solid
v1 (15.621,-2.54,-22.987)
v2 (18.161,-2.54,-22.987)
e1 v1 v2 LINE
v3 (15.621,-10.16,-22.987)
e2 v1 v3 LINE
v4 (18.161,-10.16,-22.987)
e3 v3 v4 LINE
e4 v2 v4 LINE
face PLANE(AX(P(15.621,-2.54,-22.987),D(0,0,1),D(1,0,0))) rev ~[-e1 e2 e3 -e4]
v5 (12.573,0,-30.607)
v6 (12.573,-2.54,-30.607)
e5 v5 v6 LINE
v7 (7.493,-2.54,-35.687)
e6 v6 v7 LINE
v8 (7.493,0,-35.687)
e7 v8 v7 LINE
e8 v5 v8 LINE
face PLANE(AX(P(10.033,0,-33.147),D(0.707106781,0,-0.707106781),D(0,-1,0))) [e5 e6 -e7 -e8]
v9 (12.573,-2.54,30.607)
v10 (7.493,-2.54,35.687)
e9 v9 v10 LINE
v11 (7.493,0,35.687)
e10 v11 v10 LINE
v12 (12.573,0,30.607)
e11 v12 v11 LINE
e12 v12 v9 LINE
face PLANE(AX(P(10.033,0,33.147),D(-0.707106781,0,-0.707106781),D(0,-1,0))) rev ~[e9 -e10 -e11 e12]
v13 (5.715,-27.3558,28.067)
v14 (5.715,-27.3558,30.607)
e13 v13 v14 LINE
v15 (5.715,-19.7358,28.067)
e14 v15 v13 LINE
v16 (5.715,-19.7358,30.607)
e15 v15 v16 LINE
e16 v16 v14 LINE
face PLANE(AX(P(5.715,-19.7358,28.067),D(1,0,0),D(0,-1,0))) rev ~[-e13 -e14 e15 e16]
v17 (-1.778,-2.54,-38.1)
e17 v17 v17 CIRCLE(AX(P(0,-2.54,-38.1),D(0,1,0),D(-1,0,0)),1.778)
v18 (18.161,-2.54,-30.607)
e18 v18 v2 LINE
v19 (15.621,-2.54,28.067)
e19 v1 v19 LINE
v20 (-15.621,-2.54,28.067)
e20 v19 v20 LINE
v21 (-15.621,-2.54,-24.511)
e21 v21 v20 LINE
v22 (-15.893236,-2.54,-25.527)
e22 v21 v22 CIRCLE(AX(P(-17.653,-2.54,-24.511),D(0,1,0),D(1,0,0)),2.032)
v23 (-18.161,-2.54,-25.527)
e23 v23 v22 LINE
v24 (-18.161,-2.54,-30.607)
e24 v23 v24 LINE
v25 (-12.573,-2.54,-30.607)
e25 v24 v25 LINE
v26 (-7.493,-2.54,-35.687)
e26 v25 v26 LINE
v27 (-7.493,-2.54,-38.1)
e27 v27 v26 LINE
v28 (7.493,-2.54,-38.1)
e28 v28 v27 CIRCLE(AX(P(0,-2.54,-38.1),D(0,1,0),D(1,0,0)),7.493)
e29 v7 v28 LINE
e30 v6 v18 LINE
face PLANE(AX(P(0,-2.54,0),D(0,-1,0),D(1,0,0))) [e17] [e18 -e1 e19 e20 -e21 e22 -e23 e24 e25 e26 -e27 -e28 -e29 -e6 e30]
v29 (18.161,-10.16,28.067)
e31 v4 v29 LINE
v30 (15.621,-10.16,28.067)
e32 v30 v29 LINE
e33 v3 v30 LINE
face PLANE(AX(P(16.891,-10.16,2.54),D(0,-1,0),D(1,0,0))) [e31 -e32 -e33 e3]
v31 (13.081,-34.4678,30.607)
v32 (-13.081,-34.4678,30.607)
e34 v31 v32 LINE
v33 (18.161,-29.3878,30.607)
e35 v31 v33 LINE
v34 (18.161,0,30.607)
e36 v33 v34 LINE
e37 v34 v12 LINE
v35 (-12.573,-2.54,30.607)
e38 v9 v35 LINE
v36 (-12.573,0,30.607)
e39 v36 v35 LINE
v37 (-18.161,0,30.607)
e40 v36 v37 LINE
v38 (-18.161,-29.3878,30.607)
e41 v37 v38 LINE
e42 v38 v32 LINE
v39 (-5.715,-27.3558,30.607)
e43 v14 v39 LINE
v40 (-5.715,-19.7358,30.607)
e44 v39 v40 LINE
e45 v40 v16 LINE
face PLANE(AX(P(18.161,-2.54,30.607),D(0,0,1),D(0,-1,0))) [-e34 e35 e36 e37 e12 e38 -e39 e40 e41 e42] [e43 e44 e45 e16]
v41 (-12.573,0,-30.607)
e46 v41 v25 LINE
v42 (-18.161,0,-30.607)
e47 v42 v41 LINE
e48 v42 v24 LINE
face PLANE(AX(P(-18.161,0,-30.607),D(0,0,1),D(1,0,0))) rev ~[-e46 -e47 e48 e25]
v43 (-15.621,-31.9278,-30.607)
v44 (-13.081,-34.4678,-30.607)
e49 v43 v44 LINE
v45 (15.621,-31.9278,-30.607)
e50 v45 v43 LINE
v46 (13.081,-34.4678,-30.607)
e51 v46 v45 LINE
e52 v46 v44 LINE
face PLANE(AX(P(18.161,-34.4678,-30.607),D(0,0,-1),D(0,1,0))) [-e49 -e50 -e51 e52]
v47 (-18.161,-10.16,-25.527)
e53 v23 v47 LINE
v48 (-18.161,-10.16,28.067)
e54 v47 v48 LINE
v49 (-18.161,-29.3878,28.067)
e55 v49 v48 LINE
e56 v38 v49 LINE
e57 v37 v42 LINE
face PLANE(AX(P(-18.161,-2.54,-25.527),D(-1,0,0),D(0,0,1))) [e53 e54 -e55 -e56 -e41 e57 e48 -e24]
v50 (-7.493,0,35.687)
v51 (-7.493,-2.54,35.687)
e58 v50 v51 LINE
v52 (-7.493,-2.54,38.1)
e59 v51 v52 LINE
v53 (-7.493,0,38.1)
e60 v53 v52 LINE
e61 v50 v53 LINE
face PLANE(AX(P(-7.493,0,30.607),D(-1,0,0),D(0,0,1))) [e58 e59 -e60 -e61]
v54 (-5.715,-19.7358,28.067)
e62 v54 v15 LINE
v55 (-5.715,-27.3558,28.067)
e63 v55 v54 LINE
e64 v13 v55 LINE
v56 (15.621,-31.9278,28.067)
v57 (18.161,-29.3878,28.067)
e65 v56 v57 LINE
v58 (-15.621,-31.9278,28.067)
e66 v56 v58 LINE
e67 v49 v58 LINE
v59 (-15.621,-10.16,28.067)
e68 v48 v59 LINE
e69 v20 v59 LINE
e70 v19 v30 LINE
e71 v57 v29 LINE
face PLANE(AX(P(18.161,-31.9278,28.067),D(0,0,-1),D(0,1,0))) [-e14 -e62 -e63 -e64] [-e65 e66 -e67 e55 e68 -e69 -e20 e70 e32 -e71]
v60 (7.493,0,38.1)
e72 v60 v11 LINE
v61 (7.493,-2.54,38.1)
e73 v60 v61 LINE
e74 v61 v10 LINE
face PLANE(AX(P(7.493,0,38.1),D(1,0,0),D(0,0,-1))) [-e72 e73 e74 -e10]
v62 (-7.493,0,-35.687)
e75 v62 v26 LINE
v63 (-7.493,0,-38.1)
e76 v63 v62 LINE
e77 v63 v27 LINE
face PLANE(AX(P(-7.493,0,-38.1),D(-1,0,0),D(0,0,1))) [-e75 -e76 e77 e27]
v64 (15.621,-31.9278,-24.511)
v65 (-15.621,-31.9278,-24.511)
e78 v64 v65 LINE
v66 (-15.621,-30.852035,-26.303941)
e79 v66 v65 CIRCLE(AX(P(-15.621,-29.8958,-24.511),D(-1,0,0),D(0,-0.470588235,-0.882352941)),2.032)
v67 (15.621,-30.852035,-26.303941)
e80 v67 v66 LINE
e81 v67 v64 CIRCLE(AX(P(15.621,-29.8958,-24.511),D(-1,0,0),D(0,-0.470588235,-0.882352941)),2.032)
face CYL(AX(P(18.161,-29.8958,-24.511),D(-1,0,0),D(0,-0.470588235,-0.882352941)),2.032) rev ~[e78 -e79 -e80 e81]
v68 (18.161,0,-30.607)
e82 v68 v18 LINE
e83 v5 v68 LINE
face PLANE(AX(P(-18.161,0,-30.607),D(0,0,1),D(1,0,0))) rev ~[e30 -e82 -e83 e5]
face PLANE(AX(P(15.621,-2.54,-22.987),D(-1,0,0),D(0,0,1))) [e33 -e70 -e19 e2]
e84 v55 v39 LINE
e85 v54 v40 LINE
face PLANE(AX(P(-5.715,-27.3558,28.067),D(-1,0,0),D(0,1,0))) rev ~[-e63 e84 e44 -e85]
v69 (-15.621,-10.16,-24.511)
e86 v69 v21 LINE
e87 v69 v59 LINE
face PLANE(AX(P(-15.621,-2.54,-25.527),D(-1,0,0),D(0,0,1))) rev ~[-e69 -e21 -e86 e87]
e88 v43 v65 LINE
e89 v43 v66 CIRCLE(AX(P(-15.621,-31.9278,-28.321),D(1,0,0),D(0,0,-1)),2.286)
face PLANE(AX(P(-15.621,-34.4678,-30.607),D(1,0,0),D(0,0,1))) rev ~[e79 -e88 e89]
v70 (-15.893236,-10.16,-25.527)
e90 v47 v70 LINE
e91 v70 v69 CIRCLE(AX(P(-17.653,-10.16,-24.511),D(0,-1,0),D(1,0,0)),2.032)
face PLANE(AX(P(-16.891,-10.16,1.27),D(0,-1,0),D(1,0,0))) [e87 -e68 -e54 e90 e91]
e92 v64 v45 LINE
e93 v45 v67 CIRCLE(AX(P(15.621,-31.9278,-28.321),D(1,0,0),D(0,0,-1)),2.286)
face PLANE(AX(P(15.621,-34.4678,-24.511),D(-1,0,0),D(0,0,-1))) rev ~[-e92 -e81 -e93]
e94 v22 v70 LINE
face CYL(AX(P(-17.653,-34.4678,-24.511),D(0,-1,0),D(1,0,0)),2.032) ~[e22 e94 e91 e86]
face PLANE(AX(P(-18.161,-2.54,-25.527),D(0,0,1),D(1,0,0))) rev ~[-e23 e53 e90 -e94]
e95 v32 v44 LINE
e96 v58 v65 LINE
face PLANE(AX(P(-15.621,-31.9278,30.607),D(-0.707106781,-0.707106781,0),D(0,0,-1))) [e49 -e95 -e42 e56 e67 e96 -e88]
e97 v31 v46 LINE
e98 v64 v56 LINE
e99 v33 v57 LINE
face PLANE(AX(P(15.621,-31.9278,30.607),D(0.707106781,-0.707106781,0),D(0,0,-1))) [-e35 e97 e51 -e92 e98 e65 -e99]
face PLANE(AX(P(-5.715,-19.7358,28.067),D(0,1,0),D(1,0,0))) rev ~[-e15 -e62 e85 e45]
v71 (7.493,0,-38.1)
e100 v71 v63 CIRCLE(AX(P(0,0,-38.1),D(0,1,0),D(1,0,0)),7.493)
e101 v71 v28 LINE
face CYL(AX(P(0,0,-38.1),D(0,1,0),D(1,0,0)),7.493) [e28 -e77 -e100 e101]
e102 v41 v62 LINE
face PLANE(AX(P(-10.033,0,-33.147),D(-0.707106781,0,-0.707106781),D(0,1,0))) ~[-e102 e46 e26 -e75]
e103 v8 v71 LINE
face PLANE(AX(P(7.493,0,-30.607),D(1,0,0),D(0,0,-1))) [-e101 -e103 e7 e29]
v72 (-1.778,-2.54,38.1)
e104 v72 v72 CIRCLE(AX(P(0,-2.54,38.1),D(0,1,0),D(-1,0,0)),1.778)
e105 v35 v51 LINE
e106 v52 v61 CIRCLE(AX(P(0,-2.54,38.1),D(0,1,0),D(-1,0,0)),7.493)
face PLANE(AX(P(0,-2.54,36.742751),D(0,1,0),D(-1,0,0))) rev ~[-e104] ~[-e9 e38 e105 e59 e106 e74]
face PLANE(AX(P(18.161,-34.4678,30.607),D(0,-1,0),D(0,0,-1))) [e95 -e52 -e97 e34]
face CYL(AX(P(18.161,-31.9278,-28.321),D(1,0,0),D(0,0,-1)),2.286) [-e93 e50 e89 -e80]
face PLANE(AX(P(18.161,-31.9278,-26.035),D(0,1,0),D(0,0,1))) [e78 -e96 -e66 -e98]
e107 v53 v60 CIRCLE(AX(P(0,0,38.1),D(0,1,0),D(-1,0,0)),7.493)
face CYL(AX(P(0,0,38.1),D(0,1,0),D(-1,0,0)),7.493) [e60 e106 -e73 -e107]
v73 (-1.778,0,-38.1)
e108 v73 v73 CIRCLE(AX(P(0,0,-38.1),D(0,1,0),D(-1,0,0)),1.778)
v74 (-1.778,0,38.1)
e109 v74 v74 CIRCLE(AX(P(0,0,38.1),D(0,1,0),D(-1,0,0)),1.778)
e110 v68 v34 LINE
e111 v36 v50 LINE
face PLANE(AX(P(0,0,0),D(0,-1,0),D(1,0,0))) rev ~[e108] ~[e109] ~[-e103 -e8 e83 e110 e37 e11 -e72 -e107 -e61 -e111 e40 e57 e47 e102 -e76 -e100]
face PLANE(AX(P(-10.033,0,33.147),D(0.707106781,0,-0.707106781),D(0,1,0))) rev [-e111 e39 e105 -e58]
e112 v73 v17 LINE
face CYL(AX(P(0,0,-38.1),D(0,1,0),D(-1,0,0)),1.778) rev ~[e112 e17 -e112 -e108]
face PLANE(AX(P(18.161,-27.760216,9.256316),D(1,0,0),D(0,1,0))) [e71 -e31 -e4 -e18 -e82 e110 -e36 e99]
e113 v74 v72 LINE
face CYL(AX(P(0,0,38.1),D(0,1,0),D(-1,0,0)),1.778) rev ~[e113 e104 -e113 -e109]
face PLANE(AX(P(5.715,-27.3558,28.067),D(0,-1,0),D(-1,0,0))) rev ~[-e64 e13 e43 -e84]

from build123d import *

# Parameters (mm, degrees)
F1_DEPTH       = 2.54
F3_DEPTH       = 36.322
F4_W           = 2.5400000004
F4_H           = 53.594
F4_W_2         = 2.5400000003
F4_H_2         = 51.054
F5_DEPTH       = 7.62
F6_R           = 2.032
F7_SIZE        = 5.08
F8_SIZE        = 5.08
F10_DEPTH      = 31.9278
F12_R          = 1.778
F13_DEPTH      = 2.54
F14_SIZE       = 5.08
F16_DEPTH      = 2.54
F16_DEPTH_BACK = 25.4


with BuildPart() as f1:
    # F0 (on Front) → F1 (new body)
    with BuildSketch(Plane.XZ):
        Polygon((18.161, 9.3117938122), (18.161, 30.607), (-18.161, 30.607), (-18.161, 9.3117938122), (-18.161, -9.3117938122), (-18.161, -30.607), (18.161, -30.607), (18.161, -9.3117938122), align=None)
    extrude(amount=F1_DEPTH)

    # F2 (on face) → F3 (join, through all)
    with BuildSketch(Plane.YZ.offset(18.161)):
        Polygon((-2.54, 28.067), (-2.54, 30.607), (-34.4678, 30.607), (-34.4678, -30.607), (-31.9278, -30.607), (-31.9278, -26.035), (-31.9278, 28.067), align=None)
        with BuildLine():
            ThreePointArc((-31.9278, -30.607), (-29.6418, -28.321), (-31.9278, -26.035))
            Line((-31.9278, -26.035), (-31.9278, -30.607))
        make_face()
    extrude(amount=-F3_DEPTH)

    # F4 (on face) → F5 (join)
    with BuildSketch(Plane.XZ.offset(2.54)):
        with Locations((-16.8910000002, 1.27)):
            Rectangle(F4_W, F4_H)
        with Locations((16.8909999998, 2.54)):
            Rectangle(F4_W_2, F4_H_2)
    extrude(amount=F5_DEPTH)

    # F6
    f6_edges = [f1.edges().sort_by_distance(p)[0] for p in [
        (0, -31.9278, -30.607),
        (0, -31.9278, -26.035),
    ]]
    fillet(f6_edges, radius=F6_R)

    # F7
    f7_edges = [f1.edges().sort_by_distance(p)[0] for p in [
        (18.161, -34.4678, 0),
    ]]
    chamfer(f7_edges, length=F7_SIZE)

    # F8
    f8_edges = [f1.edges().sort_by_distance(p)[0] for p in [
        (-18.161, -34.4678, 0),
    ]]
    chamfer(f8_edges, length=F8_SIZE)

    # F9 (on face) → F10 (cut, through all)
    with BuildSketch(Plane.XZ.offset(34.4678)):
        with BuildLine():
            ThreePointArc((-15.621, -24.511), (-15.910574375, -25.556455375), (-16.6967647059, -26.3039411765))
            ThreePointArc((-16.6967647059, -26.3039411765), (-17.8387457553, -28.8754364388), (-15.621, -30.607))
            Line((-15.621, -30.607), (-15.621, -24.511))
        make_face()
        with BuildLine():
            ThreePointArc((15.621, -30.607), (17.8387457553, -28.8754364388), (16.6967647059, -26.3039411765))
            ThreePointArc((16.6967647059, -26.3039411765), (15.910574375, -25.556455375), (15.621, -24.511))
            Line((15.621, -24.511), (15.621, -30.607))
        make_face()
    extrude(amount=-F10_DEPTH, mode=Mode.SUBTRACT)

    # F12 (on face) → F13 (join, through all)
    with BuildSketch(Plane(origin=(0, 0, 0), x_dir=(-1, 0, 0), z_dir=(0, 1, 0))):
        with BuildLine():
            Line((-7.493, 38.1), (-7.493, 30.607))
            Line((-7.493, 30.607), (7.493, 30.607))
            Line((7.493, 30.607), (7.493, 38.1))
            ThreePointArc((7.493, 38.1), (0, 45.593), (-7.493, 38.1))
        make_face()
        with Locations((0, 38.1)):
            Circle(F12_R, mode=Mode.SUBTRACT)
        with BuildLine():
            Line((-6.35, -30.607), (-7.493, -30.607))
            Line((-7.493, -30.607), (-7.493, -38.1))
            ThreePointArc((-7.493, -38.1), (0, -45.593), (7.493, -38.1))
            Line((7.493, -38.1), (7.493, -30.607))
            Line((7.493, -30.607), (6.35, -30.607))
            Line((6.35, -30.607), (0, -30.607))
            Line((0, -30.607), (-6.35, -30.607))
        make_face()
        with Locations((0, -38.1)):
            Circle(F12_R, mode=Mode.SUBTRACT)
    extrude(amount=-F13_DEPTH)

    # F14
    f14_edges = [f1.edges().sort_by_distance(p)[0] for p in [
        (-7.493, -1.27, -30.607),
        (7.493, -1.27, -30.607),
        (7.493, -1.27, 30.607),
        (-7.493, -1.27, 30.607),
    ]]
    chamfer(f14_edges, length=F14_SIZE)

    # F15 (on face) → F16 (cut, two sides)
    with BuildSketch(Plane(origin=(0, 0, 28.067), x_dir=(1, 0, 0), z_dir=(0, 0, -1))) as f16_sk:
        Polygon((5.715, 27.3558), (0, 27.3558), (-5.715, 27.3558), (-5.715, 19.7358), (5.715, 19.7358), align=None)
    extrude(amount=-F16_DEPTH, mode=Mode.SUBTRACT)
    extrude(f16_sk.sketch, amount=F16_DEPTH_BACK, mode=Mode.SUBTRACT)


solid = f1.part
